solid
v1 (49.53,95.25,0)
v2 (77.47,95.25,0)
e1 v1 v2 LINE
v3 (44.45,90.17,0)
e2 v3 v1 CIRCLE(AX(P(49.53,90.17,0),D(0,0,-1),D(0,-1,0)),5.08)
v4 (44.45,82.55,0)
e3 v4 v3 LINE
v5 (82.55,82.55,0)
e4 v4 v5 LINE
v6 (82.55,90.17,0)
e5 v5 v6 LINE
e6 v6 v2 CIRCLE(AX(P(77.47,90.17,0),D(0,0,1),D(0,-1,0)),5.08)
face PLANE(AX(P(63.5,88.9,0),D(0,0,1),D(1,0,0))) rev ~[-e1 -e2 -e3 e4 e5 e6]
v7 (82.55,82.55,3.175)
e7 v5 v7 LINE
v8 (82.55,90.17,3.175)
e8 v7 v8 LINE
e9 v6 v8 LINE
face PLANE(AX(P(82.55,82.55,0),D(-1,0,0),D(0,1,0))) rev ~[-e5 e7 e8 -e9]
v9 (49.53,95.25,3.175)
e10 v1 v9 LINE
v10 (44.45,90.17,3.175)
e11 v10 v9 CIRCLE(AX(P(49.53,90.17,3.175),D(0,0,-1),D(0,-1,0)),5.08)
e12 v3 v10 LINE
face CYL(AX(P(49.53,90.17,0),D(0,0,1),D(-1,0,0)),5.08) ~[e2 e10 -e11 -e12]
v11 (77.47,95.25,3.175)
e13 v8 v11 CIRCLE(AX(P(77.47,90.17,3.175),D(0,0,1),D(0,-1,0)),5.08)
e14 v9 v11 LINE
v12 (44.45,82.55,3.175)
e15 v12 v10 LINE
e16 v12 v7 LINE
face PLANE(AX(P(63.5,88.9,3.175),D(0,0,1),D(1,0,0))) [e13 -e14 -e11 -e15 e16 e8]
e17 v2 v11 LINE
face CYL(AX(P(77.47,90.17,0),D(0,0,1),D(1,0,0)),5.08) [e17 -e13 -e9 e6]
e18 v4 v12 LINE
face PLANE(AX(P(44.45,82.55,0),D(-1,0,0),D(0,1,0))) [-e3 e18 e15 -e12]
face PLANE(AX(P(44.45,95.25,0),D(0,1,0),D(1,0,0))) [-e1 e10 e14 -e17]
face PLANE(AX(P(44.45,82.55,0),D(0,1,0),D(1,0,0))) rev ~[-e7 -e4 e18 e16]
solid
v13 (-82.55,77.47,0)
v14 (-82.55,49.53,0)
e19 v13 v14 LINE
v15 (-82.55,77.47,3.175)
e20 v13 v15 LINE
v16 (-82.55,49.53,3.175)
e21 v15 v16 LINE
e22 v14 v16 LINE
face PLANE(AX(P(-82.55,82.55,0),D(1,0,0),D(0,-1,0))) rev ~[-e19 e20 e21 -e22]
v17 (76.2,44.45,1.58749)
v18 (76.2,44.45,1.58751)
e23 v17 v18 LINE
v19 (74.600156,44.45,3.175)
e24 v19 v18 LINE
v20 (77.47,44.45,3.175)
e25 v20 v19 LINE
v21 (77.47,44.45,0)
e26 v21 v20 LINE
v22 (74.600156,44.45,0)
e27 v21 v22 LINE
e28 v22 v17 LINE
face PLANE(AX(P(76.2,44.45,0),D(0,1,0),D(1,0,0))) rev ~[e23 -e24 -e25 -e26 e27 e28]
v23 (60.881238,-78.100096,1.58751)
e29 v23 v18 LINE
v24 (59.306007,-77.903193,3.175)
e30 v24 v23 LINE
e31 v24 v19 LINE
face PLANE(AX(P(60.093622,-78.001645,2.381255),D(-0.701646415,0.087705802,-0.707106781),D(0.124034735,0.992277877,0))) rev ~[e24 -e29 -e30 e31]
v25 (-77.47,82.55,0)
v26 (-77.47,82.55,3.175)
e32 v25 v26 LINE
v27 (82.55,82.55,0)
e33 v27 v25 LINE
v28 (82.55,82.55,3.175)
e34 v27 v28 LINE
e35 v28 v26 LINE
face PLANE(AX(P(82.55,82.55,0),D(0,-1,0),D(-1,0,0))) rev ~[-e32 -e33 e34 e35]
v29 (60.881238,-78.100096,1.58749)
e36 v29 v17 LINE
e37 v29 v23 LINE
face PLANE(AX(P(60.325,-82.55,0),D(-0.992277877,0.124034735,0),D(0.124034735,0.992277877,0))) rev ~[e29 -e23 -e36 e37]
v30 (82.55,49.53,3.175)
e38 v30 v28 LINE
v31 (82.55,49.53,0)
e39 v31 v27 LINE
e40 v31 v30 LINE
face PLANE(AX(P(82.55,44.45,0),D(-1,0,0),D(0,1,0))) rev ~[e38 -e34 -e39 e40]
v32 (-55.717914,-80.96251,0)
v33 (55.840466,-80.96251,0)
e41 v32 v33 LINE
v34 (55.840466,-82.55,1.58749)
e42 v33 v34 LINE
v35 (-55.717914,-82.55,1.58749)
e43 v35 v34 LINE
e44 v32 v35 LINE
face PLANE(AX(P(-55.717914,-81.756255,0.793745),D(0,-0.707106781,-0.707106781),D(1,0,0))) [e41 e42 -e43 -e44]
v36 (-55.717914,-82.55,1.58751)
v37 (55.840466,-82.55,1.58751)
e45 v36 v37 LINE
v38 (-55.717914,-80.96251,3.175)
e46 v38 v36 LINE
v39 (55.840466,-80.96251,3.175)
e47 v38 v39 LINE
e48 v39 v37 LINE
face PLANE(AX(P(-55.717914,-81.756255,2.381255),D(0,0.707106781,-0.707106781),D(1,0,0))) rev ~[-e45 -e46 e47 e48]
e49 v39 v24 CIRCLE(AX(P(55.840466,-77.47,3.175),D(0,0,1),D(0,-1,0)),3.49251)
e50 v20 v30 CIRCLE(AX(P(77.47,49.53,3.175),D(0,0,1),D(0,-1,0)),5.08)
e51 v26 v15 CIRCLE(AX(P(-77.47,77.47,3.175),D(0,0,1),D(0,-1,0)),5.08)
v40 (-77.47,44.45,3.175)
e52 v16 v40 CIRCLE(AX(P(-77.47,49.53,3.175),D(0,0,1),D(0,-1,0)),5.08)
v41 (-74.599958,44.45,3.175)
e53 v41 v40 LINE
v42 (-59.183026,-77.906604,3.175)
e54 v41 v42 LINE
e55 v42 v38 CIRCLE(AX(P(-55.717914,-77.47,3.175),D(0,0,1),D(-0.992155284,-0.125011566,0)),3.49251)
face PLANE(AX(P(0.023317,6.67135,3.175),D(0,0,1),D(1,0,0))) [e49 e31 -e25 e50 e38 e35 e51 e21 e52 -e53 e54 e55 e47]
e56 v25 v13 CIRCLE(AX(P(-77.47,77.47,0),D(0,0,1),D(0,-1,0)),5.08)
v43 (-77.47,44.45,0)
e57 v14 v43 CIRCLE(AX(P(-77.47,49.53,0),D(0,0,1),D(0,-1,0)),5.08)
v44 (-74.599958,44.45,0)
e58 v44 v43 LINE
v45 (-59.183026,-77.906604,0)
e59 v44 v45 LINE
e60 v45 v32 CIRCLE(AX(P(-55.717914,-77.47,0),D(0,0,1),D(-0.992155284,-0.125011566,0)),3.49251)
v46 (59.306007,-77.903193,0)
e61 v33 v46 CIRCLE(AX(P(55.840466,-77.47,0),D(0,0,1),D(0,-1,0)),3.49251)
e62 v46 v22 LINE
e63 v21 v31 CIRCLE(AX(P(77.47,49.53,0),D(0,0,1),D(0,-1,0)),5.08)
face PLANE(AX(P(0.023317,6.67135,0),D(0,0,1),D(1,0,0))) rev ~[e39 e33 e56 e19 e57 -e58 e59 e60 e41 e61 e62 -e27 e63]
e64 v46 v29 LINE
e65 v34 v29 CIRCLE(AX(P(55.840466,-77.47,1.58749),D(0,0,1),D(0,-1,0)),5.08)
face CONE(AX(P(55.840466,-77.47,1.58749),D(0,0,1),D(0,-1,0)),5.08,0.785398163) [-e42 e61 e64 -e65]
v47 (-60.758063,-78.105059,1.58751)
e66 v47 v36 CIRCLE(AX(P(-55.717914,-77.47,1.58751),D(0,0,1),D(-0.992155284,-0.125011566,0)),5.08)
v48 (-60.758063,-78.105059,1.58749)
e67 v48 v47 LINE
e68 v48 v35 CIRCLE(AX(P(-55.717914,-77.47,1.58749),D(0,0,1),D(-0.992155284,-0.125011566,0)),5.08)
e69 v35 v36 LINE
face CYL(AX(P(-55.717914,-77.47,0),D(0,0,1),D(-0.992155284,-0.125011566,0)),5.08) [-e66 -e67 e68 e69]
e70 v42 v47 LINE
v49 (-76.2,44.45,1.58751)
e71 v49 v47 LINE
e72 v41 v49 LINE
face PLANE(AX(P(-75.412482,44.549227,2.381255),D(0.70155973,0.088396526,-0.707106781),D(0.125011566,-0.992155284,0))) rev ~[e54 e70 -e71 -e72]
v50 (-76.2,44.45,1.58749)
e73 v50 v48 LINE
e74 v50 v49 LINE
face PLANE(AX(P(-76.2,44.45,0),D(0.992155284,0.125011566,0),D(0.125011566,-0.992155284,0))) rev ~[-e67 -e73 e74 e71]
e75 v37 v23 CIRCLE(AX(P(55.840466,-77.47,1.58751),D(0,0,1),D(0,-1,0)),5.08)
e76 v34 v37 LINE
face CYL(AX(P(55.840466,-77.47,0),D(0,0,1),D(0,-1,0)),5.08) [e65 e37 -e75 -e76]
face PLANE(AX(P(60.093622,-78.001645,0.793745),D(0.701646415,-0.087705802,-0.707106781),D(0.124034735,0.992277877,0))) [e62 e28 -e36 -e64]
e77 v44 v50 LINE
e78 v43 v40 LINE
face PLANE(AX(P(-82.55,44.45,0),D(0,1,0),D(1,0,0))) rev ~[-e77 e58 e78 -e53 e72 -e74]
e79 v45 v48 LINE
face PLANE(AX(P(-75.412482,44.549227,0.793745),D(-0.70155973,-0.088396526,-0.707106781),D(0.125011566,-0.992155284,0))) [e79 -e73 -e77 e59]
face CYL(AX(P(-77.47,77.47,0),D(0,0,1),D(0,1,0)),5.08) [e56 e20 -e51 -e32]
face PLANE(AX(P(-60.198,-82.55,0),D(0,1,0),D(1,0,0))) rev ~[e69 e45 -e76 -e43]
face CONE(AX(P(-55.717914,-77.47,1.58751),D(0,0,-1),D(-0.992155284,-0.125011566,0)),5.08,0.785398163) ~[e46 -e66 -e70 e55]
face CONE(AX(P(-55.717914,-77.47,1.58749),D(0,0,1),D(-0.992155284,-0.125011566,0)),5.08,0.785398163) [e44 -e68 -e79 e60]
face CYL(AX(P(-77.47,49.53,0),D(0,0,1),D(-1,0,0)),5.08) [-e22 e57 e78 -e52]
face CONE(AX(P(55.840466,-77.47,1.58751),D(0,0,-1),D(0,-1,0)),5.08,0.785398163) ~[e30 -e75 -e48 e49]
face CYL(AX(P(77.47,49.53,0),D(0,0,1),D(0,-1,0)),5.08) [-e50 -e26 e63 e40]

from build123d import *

# Parameters (mm, degrees)
F2_DEPTH = 3.175
F3_W     = 38.1
F3_H     = 12.7
F4_DEPTH = 3.175
F5_R     = 5.08
F5_2_R   = 5.08
F6_SIZE  = 1.58749


# Not quite as in the source:
# - a fillet or chamfer is up to 0.001 mm smaller than in the source, because OpenCascade refuses the exact size


with BuildPart() as f2:
    # F1 (on face) → F2 (new body)
    with BuildSketch(Plane.XY):
        Polygon((82.55, 82.55), (-82.55, 82.55), (-82.55, 44.45), (-76.2, 44.45), (-60.198, -82.55), (60.325, -82.55), (76.2, 44.45), (82.55, 44.45), align=None)
    extrude(amount=F2_DEPTH)

    # F5
    f5_edges = [f2.edges().sort_by_distance(p)[0] for p in [
        (-82.55, 44.45, 1.5875),
        (-82.55, 82.55, 1.5875),
        (82.55, 44.45, 1.5875),
        (60.325, -82.55, 1.5875),
        (-60.198, -82.55, 1.5875),
    ]]
    fillet(f5_edges, radius=F5_R)

    # F6 (size 1.5875 in the source; OpenCascade refuses exactly that, so slightly less here)
    f6_edges = [f2.edges().sort_by_distance(p)[0] for p in [
        (0.061276, -82.55, 0),
        (-55.717914, -82.55, 1.5875),
        (55.840466, -82.55, 1.5875),
        (0.061276, -82.55, 3.175),
        (-59.077996, -81.28002, 0),
        (-60.758063, -78.105059, 1.5875),
        (-59.077996, -81.28002, 3.175),
        (59.202423, -81.278365, 0),
        (60.881238, -78.100096, 1.5875),
        (59.202423, -81.278365, 3.175),
    ]]
    chamfer(f6_edges, length=F6_SIZE)


with BuildPart() as f4:
    # F3 (on face) → F4 (new body)
    with BuildSketch(Plane.XY):
        with Locations((63.5, 88.9)):
            Rectangle(F3_W, F3_H)
    extrude(amount=F4_DEPTH)

    # F5#2
    f5_2_edges = [f4.edges().sort_by_distance(p)[0] for p in [
        (44.45, 95.25, 1.5875),
        (82.55, 95.25, 1.5875),
    ]]
    fillet(f5_2_edges, radius=F5_2_R)


solid = Compound([f2.part, f4.part])
